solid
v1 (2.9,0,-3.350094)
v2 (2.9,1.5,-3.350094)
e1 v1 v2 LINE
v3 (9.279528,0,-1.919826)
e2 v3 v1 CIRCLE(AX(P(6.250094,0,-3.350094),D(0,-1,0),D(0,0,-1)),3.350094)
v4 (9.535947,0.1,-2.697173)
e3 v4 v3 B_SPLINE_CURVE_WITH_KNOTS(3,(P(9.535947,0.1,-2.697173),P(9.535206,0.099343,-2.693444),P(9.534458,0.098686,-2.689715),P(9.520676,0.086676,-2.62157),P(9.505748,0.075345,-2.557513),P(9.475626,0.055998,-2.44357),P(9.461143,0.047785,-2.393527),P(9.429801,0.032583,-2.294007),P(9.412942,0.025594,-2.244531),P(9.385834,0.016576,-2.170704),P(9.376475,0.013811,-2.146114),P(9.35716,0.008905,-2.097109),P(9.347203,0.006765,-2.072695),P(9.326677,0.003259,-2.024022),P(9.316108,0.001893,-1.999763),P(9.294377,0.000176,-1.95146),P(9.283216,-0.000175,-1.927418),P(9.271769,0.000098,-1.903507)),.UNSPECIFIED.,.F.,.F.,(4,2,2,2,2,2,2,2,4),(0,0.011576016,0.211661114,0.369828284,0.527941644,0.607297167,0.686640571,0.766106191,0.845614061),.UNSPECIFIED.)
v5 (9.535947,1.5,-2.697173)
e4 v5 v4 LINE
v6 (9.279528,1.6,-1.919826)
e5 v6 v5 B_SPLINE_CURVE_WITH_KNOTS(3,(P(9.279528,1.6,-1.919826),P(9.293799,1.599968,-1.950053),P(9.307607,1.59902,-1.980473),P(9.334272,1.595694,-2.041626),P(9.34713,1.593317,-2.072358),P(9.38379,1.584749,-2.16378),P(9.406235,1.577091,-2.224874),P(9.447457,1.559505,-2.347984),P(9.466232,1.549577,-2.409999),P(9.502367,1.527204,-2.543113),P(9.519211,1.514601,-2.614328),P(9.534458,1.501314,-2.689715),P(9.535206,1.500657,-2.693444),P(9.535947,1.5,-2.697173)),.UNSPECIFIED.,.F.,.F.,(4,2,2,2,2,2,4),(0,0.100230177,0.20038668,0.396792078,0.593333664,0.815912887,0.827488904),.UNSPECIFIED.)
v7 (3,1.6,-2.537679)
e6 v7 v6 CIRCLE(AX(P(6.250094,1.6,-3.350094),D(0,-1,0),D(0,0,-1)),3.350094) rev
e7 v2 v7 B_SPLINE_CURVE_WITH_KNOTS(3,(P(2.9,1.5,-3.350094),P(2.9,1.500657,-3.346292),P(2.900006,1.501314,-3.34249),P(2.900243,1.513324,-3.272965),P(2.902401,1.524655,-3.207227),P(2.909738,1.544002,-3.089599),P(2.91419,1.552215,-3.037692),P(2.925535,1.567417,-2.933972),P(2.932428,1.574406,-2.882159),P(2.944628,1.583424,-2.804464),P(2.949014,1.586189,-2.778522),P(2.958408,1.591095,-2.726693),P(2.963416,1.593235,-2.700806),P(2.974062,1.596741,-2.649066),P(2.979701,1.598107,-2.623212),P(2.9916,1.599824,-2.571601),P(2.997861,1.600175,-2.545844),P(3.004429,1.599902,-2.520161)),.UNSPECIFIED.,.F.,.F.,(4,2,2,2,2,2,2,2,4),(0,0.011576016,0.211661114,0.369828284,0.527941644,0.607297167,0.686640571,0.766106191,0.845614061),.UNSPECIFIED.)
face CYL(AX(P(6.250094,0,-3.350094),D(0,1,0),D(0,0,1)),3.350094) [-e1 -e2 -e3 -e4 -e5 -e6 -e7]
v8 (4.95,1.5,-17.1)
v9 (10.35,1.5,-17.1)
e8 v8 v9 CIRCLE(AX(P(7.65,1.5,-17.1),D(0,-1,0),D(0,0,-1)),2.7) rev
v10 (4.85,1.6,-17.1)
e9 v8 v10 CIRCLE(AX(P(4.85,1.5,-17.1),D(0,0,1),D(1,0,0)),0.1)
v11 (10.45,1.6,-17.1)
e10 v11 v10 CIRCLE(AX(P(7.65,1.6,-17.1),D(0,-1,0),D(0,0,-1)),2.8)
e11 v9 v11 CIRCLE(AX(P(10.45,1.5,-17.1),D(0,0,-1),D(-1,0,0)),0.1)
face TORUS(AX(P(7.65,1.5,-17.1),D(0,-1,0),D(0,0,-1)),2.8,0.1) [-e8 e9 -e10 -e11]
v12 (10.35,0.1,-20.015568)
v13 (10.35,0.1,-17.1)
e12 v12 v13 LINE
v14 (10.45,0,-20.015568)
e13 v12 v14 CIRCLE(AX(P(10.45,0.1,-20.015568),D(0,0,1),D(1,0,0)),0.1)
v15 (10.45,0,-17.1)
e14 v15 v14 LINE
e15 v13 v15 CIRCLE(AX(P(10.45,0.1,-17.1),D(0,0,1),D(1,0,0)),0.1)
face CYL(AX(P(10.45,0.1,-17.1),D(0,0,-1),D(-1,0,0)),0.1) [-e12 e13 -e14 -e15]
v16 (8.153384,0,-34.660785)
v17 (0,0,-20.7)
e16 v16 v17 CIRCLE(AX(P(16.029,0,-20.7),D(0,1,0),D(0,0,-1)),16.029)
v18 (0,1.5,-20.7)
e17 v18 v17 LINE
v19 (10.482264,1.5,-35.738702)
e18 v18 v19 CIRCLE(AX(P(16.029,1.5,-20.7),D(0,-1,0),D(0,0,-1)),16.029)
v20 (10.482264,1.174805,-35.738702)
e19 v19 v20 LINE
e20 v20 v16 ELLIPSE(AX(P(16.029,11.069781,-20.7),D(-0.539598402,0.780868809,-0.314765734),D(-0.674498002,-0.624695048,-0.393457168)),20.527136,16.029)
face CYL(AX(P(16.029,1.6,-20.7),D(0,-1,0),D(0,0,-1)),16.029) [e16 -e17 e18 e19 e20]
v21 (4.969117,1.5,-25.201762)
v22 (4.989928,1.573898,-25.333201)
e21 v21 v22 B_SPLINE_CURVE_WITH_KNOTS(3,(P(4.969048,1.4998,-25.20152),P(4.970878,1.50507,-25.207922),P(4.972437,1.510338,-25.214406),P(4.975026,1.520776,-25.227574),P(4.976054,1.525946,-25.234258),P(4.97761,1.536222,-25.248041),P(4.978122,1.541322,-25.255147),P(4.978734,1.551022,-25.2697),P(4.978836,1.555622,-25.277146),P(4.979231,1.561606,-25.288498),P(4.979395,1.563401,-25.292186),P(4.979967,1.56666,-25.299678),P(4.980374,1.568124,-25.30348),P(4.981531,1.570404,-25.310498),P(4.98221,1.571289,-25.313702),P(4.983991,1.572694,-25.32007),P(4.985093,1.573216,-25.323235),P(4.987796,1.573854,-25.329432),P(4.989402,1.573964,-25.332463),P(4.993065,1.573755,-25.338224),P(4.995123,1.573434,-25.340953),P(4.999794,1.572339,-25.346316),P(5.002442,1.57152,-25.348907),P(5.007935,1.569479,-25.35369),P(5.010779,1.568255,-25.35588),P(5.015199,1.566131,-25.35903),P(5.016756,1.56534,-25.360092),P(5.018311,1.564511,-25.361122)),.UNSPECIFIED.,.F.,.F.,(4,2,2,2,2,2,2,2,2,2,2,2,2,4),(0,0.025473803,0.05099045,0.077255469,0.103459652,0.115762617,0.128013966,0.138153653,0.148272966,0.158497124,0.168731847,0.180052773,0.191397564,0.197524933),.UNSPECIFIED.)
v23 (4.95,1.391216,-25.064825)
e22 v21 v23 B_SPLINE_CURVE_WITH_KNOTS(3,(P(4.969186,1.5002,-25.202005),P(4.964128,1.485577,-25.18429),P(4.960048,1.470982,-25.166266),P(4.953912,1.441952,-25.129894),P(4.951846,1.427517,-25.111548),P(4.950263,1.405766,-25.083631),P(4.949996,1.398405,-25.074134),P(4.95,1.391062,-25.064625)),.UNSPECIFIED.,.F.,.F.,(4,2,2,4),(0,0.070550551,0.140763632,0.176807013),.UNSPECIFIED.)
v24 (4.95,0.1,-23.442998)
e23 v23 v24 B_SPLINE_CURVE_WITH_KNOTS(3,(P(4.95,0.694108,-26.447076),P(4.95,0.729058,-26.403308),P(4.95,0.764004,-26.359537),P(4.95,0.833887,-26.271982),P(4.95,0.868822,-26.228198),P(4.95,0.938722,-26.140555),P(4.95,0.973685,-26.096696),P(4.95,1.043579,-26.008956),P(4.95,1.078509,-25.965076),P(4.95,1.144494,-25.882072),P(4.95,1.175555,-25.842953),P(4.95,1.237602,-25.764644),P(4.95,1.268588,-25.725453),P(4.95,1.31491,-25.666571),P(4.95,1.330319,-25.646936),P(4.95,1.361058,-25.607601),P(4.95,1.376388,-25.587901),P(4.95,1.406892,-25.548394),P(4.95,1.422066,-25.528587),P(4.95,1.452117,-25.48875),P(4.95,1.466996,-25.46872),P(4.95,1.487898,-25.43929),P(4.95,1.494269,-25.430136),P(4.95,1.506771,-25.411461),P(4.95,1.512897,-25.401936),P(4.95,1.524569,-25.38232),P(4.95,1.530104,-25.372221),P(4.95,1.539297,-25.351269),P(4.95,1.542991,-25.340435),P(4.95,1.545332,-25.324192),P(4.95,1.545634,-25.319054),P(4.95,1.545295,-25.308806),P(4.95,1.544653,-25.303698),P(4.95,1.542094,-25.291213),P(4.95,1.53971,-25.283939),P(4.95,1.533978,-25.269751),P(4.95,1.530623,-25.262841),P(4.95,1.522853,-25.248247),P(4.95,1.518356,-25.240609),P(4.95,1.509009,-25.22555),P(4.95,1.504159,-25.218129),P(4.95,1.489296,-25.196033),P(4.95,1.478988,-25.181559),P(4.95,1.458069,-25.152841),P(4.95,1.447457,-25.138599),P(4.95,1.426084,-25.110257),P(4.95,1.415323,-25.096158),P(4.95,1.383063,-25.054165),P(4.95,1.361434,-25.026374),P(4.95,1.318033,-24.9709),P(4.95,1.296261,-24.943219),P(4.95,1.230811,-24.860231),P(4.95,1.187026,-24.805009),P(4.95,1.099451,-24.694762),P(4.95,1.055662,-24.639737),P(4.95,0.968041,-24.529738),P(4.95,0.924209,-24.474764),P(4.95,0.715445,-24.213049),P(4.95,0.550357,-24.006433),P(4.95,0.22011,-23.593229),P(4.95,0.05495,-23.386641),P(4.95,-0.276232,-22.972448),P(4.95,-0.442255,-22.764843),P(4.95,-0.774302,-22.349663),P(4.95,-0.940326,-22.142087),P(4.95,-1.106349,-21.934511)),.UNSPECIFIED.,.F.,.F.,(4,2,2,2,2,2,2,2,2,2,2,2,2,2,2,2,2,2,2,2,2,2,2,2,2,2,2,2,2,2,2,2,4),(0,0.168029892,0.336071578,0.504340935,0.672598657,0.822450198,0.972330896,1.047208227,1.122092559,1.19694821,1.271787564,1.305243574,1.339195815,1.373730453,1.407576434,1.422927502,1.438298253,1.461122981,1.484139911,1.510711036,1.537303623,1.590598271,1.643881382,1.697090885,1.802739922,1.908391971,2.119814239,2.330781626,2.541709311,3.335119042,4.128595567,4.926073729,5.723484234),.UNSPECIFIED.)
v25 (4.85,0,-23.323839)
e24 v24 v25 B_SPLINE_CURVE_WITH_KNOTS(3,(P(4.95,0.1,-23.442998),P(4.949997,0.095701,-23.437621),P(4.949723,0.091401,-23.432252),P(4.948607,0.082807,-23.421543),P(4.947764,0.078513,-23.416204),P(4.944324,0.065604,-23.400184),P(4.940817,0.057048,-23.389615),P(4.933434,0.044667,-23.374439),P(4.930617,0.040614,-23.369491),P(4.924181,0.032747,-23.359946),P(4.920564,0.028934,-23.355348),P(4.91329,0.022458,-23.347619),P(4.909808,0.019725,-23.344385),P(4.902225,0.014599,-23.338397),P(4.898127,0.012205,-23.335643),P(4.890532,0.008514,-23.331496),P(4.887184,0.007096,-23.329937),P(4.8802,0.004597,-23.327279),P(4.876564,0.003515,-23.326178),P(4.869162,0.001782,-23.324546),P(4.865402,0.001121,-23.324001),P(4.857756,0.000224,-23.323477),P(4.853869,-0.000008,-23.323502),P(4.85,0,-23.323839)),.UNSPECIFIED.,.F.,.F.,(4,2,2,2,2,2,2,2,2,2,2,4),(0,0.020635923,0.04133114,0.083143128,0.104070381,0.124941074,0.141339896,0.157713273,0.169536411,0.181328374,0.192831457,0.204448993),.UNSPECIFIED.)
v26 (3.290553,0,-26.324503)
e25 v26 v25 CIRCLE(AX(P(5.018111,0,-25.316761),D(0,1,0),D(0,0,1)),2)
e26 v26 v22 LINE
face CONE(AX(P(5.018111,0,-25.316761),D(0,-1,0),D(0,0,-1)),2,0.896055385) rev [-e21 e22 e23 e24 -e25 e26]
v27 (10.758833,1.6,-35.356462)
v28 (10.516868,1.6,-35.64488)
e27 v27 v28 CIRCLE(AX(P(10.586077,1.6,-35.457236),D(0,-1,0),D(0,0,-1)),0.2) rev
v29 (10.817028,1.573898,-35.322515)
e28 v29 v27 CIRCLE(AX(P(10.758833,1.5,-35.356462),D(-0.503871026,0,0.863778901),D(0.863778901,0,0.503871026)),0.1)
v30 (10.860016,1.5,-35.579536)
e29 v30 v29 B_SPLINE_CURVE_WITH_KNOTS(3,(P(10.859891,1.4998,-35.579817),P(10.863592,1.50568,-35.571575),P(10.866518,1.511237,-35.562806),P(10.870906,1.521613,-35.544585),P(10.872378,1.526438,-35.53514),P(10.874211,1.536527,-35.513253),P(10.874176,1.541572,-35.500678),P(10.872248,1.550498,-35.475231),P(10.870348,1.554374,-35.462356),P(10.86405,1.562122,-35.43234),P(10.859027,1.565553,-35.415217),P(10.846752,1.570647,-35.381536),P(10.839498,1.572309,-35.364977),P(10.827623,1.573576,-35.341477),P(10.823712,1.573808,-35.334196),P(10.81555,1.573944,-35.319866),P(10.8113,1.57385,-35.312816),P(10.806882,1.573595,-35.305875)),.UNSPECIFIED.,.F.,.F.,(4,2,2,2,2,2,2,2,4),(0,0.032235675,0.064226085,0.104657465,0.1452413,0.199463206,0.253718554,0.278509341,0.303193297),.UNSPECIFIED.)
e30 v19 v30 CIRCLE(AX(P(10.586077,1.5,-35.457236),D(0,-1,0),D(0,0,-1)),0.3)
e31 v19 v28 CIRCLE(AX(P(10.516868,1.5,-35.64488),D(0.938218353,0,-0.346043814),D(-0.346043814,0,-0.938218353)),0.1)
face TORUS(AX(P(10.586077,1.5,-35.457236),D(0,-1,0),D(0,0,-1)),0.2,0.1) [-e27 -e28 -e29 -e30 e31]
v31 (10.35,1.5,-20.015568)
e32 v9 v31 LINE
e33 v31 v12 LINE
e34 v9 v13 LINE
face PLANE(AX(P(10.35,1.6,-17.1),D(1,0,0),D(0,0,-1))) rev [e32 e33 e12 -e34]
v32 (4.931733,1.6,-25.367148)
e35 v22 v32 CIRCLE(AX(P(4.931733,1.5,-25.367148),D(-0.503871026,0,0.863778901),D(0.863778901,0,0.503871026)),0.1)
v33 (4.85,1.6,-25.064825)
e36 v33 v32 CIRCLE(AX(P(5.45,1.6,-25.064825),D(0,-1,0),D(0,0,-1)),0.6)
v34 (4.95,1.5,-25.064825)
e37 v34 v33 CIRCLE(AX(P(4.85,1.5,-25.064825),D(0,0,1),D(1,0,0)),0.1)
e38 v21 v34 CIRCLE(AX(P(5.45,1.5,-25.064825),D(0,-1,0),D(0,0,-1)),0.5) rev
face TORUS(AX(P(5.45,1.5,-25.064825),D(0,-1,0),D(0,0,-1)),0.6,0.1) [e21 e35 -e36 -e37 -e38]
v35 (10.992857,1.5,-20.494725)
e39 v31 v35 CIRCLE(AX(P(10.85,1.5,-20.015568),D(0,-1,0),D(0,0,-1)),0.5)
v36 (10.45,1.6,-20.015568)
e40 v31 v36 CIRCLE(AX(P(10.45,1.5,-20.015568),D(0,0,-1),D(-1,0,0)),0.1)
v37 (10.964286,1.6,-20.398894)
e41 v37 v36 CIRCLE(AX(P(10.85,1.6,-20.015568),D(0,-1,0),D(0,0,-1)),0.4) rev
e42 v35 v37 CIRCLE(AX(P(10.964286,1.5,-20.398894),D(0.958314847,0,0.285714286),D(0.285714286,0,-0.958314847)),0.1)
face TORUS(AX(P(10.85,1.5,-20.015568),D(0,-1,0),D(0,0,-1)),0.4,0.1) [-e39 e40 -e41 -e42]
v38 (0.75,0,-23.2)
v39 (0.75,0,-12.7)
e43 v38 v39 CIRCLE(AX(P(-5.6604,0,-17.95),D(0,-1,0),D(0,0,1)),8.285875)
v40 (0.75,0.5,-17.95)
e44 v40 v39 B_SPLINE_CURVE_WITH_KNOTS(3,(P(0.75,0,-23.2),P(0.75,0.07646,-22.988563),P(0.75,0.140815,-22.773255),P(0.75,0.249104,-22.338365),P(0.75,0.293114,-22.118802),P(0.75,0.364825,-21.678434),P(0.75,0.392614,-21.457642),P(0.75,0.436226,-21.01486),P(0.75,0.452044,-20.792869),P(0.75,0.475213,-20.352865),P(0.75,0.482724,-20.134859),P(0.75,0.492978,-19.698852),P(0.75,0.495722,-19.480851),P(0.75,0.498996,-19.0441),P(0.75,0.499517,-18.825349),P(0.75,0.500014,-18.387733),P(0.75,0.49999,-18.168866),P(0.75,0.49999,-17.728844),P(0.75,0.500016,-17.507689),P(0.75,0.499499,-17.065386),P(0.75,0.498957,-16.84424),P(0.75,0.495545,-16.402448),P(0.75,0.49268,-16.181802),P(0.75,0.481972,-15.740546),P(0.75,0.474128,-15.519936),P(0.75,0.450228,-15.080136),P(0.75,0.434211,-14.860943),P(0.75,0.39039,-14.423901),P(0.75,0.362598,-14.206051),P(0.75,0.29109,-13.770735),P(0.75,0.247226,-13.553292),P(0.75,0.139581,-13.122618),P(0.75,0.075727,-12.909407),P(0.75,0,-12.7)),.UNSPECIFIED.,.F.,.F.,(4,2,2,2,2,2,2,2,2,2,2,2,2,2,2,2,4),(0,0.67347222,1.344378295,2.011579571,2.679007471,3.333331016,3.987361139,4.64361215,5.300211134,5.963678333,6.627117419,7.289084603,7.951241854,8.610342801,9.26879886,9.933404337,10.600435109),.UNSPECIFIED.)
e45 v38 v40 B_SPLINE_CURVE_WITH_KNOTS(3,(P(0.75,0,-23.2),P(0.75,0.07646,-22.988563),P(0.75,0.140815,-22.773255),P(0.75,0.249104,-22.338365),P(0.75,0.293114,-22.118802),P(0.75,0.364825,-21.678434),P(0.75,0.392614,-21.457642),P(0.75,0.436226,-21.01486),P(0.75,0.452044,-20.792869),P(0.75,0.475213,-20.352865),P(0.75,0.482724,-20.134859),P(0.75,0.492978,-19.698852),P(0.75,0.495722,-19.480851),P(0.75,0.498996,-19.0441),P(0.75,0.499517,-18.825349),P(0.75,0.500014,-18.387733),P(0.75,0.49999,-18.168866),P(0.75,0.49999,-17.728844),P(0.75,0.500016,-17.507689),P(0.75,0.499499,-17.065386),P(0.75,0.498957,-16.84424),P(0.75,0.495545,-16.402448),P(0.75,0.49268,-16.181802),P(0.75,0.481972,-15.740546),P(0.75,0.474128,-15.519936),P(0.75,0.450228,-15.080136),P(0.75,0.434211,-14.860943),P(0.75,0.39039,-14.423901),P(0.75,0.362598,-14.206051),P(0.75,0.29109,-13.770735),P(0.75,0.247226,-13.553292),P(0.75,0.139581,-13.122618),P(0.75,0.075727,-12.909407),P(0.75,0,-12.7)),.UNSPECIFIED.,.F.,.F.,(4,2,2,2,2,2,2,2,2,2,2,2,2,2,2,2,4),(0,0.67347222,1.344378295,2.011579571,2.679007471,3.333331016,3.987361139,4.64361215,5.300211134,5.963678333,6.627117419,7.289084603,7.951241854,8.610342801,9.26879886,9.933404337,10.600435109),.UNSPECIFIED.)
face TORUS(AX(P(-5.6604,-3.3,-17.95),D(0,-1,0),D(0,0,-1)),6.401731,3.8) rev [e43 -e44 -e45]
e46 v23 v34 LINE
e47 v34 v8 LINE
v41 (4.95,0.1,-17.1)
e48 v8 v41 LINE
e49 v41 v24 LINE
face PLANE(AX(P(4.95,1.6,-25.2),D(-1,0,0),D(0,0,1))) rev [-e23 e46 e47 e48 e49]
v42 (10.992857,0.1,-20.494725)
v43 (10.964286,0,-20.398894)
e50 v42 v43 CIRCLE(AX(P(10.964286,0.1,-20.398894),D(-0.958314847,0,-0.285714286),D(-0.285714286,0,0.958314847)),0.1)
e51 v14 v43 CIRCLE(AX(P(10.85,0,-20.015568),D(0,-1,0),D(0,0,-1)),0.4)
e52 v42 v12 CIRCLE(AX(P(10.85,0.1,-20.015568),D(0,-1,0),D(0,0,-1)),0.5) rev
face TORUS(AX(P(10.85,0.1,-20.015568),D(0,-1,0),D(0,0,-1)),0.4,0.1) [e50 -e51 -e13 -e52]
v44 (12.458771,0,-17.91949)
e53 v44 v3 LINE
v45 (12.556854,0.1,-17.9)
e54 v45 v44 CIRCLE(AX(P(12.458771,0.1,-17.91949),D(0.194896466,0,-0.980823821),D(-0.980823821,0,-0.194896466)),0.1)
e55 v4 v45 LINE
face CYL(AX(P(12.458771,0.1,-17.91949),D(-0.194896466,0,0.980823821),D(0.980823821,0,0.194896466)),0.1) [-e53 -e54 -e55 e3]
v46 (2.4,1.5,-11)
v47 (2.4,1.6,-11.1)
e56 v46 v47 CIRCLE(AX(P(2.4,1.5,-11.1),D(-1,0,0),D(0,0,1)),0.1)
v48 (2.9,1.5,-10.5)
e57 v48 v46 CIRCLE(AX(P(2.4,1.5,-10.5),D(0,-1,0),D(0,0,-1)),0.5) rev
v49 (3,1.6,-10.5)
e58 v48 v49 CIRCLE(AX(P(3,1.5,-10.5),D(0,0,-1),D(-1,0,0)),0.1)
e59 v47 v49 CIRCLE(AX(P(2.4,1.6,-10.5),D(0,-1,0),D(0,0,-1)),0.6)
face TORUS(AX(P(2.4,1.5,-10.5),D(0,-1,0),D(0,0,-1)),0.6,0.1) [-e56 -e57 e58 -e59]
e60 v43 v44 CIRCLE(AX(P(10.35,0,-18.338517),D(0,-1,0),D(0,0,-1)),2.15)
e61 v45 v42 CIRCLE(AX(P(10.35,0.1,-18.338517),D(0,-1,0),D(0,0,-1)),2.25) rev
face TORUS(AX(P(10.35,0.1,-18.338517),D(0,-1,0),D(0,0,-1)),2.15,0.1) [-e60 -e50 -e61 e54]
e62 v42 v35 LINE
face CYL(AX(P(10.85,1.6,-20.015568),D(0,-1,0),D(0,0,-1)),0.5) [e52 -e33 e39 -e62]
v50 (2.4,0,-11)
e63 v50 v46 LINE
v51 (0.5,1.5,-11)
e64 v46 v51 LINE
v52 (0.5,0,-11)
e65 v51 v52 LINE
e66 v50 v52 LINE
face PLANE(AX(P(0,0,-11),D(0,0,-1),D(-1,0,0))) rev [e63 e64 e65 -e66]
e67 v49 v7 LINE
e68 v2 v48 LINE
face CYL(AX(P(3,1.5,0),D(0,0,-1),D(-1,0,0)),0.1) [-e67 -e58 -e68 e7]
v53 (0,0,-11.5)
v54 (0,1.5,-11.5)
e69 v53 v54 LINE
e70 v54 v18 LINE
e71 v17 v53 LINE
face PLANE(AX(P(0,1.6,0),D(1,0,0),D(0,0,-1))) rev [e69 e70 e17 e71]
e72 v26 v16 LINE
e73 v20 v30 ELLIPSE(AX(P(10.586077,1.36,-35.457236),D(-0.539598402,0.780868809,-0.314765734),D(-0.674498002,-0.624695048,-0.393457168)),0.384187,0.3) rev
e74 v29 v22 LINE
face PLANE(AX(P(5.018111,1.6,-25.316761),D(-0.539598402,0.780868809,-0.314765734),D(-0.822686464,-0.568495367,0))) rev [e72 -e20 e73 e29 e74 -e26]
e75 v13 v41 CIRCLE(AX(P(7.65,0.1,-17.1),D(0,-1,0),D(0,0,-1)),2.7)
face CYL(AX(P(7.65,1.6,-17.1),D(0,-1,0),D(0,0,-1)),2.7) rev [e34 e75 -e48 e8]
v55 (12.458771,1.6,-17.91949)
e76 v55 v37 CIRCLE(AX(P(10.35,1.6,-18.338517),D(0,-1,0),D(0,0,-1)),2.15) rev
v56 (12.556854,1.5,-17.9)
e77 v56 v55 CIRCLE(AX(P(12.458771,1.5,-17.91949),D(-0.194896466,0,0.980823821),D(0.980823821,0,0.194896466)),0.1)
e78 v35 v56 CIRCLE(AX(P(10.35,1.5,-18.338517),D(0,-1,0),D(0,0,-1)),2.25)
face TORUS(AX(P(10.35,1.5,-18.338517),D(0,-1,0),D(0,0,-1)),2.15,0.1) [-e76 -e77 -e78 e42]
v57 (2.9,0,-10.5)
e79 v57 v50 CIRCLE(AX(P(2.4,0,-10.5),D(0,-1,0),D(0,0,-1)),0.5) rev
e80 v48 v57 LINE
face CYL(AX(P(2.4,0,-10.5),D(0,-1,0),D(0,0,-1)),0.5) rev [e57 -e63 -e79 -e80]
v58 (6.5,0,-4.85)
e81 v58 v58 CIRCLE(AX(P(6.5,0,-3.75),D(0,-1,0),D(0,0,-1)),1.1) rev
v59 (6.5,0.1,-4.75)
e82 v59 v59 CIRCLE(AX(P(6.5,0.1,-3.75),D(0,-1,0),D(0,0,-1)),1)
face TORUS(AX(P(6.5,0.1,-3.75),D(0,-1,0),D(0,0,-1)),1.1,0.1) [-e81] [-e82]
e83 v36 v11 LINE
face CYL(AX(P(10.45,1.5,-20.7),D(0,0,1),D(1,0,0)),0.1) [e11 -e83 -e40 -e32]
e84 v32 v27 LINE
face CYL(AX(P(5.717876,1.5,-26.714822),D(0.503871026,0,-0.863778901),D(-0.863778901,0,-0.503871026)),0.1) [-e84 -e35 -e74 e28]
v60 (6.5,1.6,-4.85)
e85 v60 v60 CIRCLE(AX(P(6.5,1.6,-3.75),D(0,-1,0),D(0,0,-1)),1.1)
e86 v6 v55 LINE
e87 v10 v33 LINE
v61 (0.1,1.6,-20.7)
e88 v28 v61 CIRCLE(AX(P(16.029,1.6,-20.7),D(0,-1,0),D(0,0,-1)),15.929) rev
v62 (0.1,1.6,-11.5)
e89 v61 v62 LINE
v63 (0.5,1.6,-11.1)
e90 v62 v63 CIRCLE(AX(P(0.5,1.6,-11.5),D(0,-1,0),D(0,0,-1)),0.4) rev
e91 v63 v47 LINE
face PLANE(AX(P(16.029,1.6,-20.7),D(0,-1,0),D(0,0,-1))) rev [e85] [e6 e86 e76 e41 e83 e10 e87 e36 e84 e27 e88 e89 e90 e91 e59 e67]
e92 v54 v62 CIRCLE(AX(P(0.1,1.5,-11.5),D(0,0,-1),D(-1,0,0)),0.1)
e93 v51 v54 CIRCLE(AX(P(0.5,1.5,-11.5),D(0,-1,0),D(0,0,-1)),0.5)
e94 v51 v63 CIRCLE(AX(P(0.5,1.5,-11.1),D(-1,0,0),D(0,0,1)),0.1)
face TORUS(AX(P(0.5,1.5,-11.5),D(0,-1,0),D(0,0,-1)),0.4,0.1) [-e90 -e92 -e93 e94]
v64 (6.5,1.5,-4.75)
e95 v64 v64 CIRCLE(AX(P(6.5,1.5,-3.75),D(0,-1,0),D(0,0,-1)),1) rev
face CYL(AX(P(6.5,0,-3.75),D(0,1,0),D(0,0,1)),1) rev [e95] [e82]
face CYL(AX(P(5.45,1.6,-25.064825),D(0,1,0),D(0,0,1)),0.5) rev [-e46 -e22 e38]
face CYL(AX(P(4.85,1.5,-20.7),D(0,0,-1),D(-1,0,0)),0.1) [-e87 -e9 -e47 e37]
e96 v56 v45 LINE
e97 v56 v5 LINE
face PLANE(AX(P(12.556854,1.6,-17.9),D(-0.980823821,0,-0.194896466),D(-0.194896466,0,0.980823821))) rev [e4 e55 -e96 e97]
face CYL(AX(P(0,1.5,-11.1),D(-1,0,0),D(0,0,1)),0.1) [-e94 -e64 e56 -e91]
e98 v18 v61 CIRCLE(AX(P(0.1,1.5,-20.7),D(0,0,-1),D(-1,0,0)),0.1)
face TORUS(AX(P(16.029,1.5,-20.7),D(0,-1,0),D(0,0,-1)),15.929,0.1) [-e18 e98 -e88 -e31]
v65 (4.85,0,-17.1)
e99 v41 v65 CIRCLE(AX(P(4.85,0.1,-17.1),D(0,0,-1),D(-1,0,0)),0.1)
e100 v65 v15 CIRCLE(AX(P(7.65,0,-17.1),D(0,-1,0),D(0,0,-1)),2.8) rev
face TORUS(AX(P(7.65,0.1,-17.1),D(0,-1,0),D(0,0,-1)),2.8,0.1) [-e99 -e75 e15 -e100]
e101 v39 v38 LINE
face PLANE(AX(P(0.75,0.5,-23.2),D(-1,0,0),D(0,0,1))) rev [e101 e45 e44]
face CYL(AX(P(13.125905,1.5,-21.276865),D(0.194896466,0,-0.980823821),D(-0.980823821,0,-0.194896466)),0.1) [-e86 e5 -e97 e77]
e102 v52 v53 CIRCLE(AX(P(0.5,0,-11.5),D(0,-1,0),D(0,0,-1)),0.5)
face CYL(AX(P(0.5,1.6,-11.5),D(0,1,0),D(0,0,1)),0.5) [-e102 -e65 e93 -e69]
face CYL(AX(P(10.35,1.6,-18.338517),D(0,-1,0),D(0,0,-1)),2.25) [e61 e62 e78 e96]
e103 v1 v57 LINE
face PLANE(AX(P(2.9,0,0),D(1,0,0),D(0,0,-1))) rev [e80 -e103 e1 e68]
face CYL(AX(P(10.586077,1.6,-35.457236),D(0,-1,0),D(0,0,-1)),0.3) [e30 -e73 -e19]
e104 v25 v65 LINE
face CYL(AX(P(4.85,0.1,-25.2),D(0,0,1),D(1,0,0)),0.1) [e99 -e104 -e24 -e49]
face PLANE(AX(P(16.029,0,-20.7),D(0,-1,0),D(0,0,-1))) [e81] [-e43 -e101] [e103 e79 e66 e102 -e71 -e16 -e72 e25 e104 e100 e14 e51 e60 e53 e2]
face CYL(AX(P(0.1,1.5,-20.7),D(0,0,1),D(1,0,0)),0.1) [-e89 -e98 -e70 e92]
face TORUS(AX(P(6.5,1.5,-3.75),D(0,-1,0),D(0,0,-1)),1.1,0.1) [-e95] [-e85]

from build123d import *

# Parameters (mm, degrees)
BOSS_EXTRUDE1_DEPTH = 1.6
SKETCH2_R           = 1.0000000000000044
SKETCH2_W           = 2.9000000000000004
SKETCH2_H           = 11
CUT_EXTRUDE1_DEPTH  = 39.174860837991275
FILLET1_R           = 0.5
FILLET10_R          = 0.3
FILLET9_R           = 0.1
CUT_EXTRUDE2_DEPTH  = 15.000001
CUT_REVOLVE1_ANGLE  = 118.304837
FILLET6_R           = 0.1
FILLET14_DEPTH      = 3
CUT_EXTRUDE3_DEPTH  = 0.5
FILLET15_R          = 3.8


with BuildPart() as part:
    # Sketch1 → Boss-Extrude1 (new body)
    with BuildSketch(Plane(origin=(0, 0, 0), x_dir=(1, 0, 0), z_dir=(0, 1, 0))):
        with BuildLine():
            Line((11.249999999999995, 36), (4.949999999999998, 25.199999999999996))
            Line((4.949999999999998, 25.199999999999996), (4.95, 17.099999999999998))
            ThreePointArc((4.95, 17.099999999999998), (7.6499999999999995, 14.399999999999999), (10.350000000000003, 17.099999999999998))
            Line((10.350000000000003, 17.099999999999998), (10.35, 20.588517047756877))
            ThreePointArc((10.35, 20.588517047756877), (12.089132450024001, 19.766073814149554), (12.556853597053188, 17.9))
            Line((12.556853597053188, 17.9), (9, 0))
            Line((9, 0), (0, 0))
            Line((0, 0), (0, 20.699999999999996))
            ThreePointArc((0, 20.699999999999996), (3.1152199182423743, 30.195426530704133), (11.249999999999995, 36))
        make_face()
    extrude(amount=BOSS_EXTRUDE1_DEPTH)

    # Sketch2 → Cut-Extrude1 (cut, through all)
    with BuildSketch(Plane(origin=(0, 1.6, 0), x_dir=(1, 0, 0), z_dir=(0, 1, 0))):
        with Locations(Location((6.5, 3.75, 0), (0, 0, 270))):
            Circle(SKETCH2_R)
        with Locations((1.4500000000000002, 5.5)):
            Rectangle(SKETCH2_W, SKETCH2_H)
    extrude(amount=-CUT_EXTRUDE1_DEPTH, mode=Mode.SUBTRACT)

    # Fillet1
    fillet1_edges = [part.edges().sort_by_distance(p)[0] for p in [
        (4.949999999999998, 0.8, -25.199999999999996),
        (10.35, 0.8, -20.588517047756877),
        (0, 0.8, -11),
        (2.9, 0.8, -11),
    ]]
    fillet(fillet1_edges, radius=FILLET1_R)

    # Fillet10
    fillet10_edges = [part.edges().sort_by_distance(p)[0] for p in [
        (11.249999999999995, 0.8, -36),
    ]]
    fillet(fillet10_edges, radius=FILLET10_R)

    # Fillet9
    fillet9_edges = [part.edges().sort_by_distance(p)[0] for p in [
        (10.778426798526594, 1.6, -8.95),
        (12.27700878864588, 1.6, -19.500040671486303),
        (7.650000000000002, 1.6, -14.4),
        (4.949999999999999, 1.6, -21.082412714662503),
        (2.9, 1.6, -5.25),
        (0, 1.6, -16.099999999999998),
        (1.45, 1.6, -11),
        (10.350000000000001, 1.6, -18.55778401544086),
        (7.931660533666676, 1.6, -30.311418057714306),
        (10.551192847666401, 1.6, -20.416459893750357),
        (0.1464466094067261, 1.6, -11.146446609406727),
        (2.7535533905932734, 1.6, -10.853553390593273),
        (4.967327893272973, 1.6, -25.195315418932243),
        (2.8791430216859144, 1.6, -29.865702507166827),
        (10.8159085390423, 1.6, -35.6500508828696),
    ]]
    fillet(fillet9_edges, radius=FILLET9_R)

    # Sketch4 → Cut-Extrude2 (cut)
    with BuildSketch(Plane(origin=(12.57617593241207, 1.6, -38.27344445556355), x_dir=(-0.8637789008984336, 0, -0.503871025524086), z_dir=(0.503871025524086, 0, -0.8637789008984336))):
        Polygon((0, 0), (2.0000000000000004, -1.6), (-0.3356716848088581, -1.6), (-0.3356716848088581, 0), align=None)
    extrude(amount=-CUT_EXTRUDE2_DEPTH, mode=Mode.SUBTRACT)

    # Cut-Revolve1: read off the stored shape, not the designer's step
    # Cut-Revolve1 outline → Cut-Revolve1 (revolve, cut)
    with BuildSketch(Plane(origin=(5.01811055, 0, -25.316760942), x_dir=(-0.8637788973054713, 0, -0.5038710316834497), z_dir=(0.5038710316834497, 0, -0.8637788973054713))):
        Polygon((0, 0), (2, 0), (0.032626635, 1.573898692), (0, 1.573898692), align=None)
    revolve(axis=Axis((5.01811055, 0, -25.316760942), (0, 0.9999999999999999, 0)), revolution_arc=CUT_REVOLVE1_ANGLE, mode=Mode.SUBTRACT)

    # Fillet6
    fillet6_edges = [part.edges().sort_by_distance(p)[0] for p in [
        (12.27700878864588, 0, -19.500040671486303),
        (10.778426798526594, 0, -8.95),
        (6.5, 0, -4.750000000000004),
        (6.5, 1.6, -4.750000000000004),
        (10.350000000000001, 0, -18.55778401544086),
        (10.551192847666401, 0, -20.416459893750357),
        (4.949999999999999, 0, -20.20896051992093),
        (7.650000000000002, 0, -14.4),
    ]]
    fillet(fillet6_edges, radius=FILLET6_R)

    # Fillet14: read off the stored shape, not the designer's step
    # Fillet14 outline → Fillet14 (cut)
    with BuildSketch(Plane(origin=(0, 0, 0), x_dir=(1, 0, 0), z_dir=(0, 1, 0))):
        with BuildLine():
            ThreePointArc((9.535946874, 2.697172876), (8.375627771, 0.760646462), (6.250094443, 0))
            Line((6.250094443, 0), (9, 0))
            Line((9, 0), (9.535946874, 2.697172876))
        make_face()
        with BuildLine():
            ThreePointArc((6.250094443, 0), (3.881219944, 0.981219945), (2.9, 3.350094443))
            Line((2.9, 3.350094443), (2.9, 0))
            Line((2.9, 0), (6.250094443, 0))
        make_face()
    extrude(amount=FILLET14_DEPTH, mode=Mode.SUBTRACT)

    # Sketch6 → Cut-Extrude3 (cut)
    with BuildSketch(Plane.XZ):
        with BuildLine():
            Line((0.75, -23.199999999999992), (0.75, -12.69999999999999))
            ThreePointArc((0.75, -12.69999999999999), (2.6254751789798503, -17.949999999999992), (0.75, -23.199999999999992))
        make_face()
    extrude(amount=-CUT_EXTRUDE3_DEPTH, mode=Mode.SUBTRACT)

    # Fillet15
    # the kernel refuses this fillet: 3.8 mm, written as the material it adds along each edge
    with BuildSketch(Plane(origin=(-5.660400180851672, 0.5, -17.949999999999992), x_dir=(0.31070324909360797, 0, 0.9505069652573175), z_dir=(-0.9505069652573175, 0, 0.31070324909360797))) as fillet15_piece_1_section:
        with BuildLine():
            CenterArc((6.401730991689845, -3.8), FILLET15_R, 60.27567085289292, 29.724329147107078)
            Line((6.401730991689845, 0), (6.401730991689845, 0.07599999999999994))
            Line((6.401730991689845, 0.07599999999999994), (8.285875359831522, 0.07599999999999994))
            Line((8.285875359831522, 0.07599999999999994), (8.361875359831522, 0))
            ThreePointArc((8.361875359831522, 0), (8.361875359831522, -0.24999999999999997), (8.323558247194356, -0.434))
            Line((8.323558247194356, -0.434), (8.285875359831522, -0.49999999999999994))
        make_face()
    fillet15_piece_1 = revolve(axis=Axis((-5.660400180851672, 0.5, -17.949999999999992), (0, 1, 0)), revolution_arc=143.79676670450274, mode=Mode.PRIVATE)
    fillet15_piece_1 = split(fillet15_piece_1, bisect_by=Plane(origin=(0.75, 0.5, -17.949999999999992), z_dir=(1, 0, 0)), keep=Keep.TOP, mode=Mode.PRIVATE)
    add(fillet15_piece_1)


solid = part.part
